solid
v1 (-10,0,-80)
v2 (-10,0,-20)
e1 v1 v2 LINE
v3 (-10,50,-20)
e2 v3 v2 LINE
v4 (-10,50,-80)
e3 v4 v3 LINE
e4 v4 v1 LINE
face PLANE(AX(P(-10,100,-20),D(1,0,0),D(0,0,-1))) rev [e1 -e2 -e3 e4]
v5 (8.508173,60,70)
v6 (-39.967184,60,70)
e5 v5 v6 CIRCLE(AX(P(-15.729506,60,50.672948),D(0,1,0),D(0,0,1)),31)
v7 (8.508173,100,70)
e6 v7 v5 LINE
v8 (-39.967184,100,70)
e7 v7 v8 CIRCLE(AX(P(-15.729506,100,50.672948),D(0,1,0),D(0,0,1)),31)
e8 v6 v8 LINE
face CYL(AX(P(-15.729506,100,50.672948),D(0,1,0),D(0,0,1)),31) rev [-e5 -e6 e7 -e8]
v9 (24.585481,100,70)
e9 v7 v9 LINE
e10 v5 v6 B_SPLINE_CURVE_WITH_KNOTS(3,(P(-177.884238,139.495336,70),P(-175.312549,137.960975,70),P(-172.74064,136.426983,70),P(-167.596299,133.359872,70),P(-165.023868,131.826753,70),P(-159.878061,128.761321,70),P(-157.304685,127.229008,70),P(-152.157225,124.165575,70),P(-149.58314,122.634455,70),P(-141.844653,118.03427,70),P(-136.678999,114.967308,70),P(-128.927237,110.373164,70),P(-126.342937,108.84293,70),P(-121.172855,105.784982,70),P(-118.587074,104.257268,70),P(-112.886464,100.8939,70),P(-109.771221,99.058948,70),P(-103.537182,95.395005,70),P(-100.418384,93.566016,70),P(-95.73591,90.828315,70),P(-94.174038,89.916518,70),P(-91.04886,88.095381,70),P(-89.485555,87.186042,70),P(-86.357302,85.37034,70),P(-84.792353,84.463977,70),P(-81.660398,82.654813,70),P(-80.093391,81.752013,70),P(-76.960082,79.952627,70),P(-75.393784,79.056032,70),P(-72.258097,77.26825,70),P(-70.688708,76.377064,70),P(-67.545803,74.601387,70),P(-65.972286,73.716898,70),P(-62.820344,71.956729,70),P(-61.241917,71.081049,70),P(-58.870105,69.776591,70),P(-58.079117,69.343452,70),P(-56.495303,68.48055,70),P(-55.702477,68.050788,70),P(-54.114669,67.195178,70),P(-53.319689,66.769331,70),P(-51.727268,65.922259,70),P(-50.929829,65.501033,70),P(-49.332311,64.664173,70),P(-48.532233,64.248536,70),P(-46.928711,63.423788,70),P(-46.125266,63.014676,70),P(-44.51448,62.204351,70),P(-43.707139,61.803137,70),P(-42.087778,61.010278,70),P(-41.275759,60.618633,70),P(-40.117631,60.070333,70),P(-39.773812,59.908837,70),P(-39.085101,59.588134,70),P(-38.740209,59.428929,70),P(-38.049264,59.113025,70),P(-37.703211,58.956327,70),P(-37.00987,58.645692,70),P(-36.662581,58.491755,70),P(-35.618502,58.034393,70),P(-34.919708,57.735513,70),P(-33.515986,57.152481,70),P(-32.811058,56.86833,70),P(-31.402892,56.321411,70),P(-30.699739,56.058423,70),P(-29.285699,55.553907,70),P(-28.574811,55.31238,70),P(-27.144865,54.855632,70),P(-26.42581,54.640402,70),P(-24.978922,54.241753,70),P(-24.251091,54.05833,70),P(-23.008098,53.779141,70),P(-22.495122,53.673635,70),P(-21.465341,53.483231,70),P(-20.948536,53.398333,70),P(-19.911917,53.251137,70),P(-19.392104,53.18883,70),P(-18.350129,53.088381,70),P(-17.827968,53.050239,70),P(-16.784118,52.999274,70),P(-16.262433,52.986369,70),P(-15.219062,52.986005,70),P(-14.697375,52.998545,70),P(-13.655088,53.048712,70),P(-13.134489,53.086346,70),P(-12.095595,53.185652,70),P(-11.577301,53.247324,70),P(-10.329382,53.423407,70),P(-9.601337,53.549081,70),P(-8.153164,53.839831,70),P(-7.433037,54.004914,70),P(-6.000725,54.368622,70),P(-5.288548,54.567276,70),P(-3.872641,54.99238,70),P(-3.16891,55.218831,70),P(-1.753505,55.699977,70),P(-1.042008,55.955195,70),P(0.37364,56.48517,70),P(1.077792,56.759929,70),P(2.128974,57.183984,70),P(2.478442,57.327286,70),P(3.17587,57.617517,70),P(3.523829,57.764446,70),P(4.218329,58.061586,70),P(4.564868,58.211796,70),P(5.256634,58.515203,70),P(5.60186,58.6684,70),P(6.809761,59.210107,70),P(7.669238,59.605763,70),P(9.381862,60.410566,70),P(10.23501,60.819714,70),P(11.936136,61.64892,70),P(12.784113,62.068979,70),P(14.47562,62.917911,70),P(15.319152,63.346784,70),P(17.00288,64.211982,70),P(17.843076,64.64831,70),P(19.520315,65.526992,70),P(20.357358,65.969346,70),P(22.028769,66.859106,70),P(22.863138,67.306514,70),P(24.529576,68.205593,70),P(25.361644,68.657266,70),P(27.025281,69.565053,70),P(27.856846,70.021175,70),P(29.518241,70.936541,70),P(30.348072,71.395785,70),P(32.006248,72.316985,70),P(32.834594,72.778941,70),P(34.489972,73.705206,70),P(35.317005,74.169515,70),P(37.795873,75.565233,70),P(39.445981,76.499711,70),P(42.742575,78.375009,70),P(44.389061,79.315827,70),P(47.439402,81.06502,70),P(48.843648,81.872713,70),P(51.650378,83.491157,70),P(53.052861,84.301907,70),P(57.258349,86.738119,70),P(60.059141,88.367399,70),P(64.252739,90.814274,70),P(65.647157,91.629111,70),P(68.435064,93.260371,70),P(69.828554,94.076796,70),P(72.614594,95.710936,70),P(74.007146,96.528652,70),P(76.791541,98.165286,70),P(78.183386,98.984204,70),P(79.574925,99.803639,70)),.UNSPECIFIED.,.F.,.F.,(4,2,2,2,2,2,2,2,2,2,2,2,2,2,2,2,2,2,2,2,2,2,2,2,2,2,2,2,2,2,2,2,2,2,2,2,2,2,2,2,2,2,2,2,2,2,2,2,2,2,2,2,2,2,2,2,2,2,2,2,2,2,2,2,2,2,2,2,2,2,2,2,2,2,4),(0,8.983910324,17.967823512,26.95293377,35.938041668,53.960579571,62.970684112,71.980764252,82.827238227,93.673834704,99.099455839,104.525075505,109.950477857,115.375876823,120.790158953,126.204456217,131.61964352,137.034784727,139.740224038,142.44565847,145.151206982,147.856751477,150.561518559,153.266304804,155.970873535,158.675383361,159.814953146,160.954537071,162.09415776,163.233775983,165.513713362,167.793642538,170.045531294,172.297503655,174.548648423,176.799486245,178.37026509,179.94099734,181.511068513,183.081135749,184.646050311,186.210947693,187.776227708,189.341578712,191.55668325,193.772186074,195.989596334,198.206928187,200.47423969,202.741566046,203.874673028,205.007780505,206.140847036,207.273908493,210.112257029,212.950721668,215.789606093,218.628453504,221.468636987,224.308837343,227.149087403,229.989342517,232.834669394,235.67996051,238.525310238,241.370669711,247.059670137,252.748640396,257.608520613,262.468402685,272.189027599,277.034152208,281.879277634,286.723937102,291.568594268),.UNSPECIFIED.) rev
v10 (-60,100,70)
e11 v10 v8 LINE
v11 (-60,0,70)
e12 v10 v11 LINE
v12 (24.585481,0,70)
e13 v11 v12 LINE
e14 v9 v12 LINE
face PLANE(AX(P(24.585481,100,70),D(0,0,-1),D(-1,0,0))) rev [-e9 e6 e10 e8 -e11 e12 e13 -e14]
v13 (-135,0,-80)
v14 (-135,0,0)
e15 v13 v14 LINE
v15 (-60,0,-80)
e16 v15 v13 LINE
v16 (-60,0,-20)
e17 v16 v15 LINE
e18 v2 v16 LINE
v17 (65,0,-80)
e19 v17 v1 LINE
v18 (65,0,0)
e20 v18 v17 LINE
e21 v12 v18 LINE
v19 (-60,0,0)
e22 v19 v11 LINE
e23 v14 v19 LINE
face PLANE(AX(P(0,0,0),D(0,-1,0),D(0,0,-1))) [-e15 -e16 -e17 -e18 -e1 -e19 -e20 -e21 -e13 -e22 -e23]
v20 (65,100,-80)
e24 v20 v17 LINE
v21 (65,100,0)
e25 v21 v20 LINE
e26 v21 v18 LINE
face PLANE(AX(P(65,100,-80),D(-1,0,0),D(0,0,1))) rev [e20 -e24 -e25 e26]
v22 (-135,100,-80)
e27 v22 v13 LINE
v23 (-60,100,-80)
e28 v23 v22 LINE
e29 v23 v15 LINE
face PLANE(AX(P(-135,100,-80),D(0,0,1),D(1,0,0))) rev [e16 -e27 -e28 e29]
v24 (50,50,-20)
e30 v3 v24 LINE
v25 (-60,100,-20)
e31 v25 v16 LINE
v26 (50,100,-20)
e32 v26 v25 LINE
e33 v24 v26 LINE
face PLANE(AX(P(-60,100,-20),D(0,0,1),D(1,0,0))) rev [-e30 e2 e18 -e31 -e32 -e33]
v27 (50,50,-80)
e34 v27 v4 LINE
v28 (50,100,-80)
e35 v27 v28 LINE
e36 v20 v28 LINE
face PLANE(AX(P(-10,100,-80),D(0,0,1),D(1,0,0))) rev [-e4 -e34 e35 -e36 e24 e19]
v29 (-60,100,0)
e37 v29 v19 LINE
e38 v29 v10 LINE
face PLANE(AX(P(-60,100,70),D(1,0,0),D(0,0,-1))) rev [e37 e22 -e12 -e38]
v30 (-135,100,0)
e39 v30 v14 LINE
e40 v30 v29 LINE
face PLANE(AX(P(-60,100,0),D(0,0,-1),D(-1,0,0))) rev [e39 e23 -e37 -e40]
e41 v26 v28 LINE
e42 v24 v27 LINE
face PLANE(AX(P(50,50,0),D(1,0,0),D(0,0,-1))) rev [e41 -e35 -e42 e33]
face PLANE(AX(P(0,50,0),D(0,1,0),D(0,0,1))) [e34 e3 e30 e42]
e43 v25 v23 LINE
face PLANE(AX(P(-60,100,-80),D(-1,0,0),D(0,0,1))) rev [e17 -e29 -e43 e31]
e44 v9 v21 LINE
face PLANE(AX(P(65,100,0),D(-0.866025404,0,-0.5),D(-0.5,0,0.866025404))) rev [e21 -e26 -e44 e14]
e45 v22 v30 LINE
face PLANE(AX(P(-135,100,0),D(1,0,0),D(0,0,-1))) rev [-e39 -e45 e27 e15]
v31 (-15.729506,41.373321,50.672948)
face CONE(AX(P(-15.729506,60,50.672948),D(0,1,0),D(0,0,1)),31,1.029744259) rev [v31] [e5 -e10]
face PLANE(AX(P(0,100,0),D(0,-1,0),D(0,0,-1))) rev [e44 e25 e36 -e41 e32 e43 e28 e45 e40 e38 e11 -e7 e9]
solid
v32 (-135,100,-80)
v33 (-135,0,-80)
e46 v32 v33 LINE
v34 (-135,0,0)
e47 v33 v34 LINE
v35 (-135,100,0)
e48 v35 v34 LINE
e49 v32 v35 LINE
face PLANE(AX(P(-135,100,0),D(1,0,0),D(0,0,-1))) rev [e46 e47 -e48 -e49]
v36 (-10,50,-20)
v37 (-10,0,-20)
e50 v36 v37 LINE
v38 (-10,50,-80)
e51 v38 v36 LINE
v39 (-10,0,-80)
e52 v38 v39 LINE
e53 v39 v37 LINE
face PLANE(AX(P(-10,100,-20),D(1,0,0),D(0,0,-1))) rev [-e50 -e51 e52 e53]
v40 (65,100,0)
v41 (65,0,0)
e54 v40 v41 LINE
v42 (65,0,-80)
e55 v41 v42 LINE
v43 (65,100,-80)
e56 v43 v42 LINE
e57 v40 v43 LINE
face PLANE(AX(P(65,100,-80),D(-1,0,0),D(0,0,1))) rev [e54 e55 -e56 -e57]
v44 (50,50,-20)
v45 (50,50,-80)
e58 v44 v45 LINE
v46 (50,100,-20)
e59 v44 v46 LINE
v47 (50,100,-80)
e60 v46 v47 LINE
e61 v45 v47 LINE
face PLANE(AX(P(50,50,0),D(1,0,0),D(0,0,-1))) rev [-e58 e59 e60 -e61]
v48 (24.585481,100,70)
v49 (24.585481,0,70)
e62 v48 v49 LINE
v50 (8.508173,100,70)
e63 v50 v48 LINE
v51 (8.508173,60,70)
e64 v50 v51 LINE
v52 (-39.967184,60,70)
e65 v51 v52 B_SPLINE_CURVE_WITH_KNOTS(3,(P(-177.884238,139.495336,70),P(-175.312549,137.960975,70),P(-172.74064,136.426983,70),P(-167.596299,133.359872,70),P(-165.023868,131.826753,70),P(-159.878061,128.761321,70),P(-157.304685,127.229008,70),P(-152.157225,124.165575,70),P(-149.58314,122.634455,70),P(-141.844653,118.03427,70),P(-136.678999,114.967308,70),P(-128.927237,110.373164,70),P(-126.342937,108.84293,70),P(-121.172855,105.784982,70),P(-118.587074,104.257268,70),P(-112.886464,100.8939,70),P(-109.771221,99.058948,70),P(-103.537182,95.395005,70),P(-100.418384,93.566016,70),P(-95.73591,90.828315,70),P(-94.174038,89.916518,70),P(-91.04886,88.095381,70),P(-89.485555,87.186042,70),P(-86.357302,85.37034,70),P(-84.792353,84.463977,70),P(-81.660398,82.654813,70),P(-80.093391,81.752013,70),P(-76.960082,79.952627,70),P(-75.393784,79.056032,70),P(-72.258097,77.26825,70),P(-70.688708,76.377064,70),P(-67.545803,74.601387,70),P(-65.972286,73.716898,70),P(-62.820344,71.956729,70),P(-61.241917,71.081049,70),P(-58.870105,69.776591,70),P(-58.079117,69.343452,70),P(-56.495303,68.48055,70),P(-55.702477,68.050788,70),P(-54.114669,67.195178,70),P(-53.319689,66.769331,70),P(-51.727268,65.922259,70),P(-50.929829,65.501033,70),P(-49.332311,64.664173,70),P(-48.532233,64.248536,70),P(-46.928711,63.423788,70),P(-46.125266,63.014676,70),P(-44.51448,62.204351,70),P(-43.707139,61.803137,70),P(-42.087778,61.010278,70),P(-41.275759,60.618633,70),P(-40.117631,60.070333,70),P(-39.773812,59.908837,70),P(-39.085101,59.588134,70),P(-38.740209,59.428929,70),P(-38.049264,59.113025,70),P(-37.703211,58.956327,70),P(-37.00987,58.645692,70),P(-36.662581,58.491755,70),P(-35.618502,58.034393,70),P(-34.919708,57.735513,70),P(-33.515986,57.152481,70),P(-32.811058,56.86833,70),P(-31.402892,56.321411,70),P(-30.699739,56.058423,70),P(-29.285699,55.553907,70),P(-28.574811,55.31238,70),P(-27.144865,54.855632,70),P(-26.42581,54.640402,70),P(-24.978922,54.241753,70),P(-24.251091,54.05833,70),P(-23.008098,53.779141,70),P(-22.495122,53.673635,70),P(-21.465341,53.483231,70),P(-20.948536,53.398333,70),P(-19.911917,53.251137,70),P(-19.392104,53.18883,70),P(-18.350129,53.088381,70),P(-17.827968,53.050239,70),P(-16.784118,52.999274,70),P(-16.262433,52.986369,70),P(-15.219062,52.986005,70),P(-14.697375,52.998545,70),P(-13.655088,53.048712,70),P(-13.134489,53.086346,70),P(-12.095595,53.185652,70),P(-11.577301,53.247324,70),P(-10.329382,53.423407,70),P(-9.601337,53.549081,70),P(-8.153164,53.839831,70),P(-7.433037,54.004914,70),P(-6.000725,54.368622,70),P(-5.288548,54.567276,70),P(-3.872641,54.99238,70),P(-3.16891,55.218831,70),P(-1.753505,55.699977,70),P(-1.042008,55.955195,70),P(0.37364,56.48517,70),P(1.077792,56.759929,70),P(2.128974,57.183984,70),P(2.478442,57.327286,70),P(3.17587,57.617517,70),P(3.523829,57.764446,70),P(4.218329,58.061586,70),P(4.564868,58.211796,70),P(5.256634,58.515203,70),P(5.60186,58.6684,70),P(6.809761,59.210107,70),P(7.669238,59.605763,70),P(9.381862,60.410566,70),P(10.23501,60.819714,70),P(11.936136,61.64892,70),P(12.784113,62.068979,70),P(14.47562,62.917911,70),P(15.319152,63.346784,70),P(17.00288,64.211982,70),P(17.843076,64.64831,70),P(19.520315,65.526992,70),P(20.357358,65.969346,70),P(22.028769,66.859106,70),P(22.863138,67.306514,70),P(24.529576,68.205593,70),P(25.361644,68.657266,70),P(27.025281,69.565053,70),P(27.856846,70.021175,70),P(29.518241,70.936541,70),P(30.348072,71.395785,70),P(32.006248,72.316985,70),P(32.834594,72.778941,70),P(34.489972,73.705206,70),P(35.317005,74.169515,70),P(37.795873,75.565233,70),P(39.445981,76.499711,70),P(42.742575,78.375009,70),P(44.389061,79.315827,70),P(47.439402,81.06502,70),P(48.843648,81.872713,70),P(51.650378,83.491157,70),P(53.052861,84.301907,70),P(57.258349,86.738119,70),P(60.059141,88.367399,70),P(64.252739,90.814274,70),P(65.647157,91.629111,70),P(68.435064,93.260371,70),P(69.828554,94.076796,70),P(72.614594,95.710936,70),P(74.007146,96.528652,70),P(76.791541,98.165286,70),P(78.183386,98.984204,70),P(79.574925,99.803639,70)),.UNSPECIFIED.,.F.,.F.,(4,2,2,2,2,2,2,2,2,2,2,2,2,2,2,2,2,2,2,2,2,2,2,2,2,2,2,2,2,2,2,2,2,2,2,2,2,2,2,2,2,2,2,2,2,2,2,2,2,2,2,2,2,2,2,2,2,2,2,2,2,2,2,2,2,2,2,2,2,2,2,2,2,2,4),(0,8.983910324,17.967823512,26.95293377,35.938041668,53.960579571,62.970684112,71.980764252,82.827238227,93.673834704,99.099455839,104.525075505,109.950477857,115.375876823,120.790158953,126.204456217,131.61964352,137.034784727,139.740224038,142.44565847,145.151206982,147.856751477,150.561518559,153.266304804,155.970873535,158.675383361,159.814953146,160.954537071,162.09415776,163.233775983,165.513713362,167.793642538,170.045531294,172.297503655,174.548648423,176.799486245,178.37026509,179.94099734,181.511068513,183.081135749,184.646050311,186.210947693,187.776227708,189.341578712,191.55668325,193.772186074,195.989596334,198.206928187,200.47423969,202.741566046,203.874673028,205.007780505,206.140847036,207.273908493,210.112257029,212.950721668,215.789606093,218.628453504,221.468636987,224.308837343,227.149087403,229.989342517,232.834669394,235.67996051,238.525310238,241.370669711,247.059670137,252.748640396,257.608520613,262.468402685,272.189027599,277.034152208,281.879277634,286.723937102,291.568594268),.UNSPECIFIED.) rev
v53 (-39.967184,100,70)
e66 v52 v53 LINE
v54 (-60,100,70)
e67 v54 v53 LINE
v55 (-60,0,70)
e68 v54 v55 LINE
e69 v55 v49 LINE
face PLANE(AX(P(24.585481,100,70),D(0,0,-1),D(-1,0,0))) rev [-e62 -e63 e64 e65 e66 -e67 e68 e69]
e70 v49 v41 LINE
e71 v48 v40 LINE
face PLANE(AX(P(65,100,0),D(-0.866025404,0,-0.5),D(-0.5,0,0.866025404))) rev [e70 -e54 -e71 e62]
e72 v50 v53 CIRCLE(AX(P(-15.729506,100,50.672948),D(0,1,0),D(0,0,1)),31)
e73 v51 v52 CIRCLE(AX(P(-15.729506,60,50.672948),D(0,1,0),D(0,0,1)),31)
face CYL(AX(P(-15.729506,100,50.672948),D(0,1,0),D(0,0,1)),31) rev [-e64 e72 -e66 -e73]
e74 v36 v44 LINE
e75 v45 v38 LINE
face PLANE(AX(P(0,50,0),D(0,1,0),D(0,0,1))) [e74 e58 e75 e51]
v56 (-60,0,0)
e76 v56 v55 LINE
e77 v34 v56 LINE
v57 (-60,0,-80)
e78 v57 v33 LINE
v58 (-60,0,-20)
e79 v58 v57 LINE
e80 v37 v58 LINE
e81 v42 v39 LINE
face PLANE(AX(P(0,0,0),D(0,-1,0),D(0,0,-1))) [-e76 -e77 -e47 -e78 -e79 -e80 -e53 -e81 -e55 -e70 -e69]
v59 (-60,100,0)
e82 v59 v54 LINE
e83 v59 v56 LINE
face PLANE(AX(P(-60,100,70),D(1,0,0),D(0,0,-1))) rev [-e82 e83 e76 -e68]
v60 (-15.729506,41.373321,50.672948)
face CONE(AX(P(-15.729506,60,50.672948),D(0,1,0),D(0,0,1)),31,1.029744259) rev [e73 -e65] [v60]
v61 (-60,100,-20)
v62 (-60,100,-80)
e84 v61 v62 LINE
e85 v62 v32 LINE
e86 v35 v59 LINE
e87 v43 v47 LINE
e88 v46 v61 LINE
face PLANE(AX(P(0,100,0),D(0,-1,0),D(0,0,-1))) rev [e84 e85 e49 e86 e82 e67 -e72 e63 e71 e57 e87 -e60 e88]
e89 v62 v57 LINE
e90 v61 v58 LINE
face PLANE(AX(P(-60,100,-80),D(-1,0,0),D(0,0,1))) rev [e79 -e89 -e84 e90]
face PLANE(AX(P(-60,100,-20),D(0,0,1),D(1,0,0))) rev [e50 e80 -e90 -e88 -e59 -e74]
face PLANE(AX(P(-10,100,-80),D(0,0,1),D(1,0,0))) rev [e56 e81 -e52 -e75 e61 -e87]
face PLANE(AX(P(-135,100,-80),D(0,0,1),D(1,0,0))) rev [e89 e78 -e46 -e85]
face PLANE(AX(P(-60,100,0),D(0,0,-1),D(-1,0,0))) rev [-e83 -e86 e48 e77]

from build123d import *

# Parameters (mm, degrees)
BOSS_EXTRUDE1_DEPTH              = 100
TAP_DRILL_FOR_M68X6_0_TAP1_D     = 62
TAP_DRILL_FOR_M68X6_0_TAP1_DEPTH = 40
TAP_DRILL_FOR_M68X6_0_TAP1_TIP   = 18.62667919
SKETCH4_W                        = 60
SKETCH4_H                        = 60
CUT_EXTRUDE1_DEPTH               = 50
BODY_MOVE_COPY1_DEPTH            = 100
BODY_MOVE_COPY1_2_OUTLINE_W      = 60
BODY_MOVE_COPY1_2_OUTLINE_H      = 60
BODY_MOVE_COPY1_2_DEPTH          = 50
BODY_MOVE_COPY1_START            = 50
BODY_MOVE_COPY1_3_DEPTH          = 10


with BuildPart() as part:
    # Sketch1 → Boss-Extrude1 (new body)
    with BuildSketch(Plane(origin=(0, 0, 0), x_dir=(1, 0, 0), z_dir=(0, 1, 0))):
        Polygon((-135, 0), (-135, 80), (-60, 80), (-60, 20), (-10, 20), (-10, 80), (65, 80), (65, 0), (24.585481157, -70), (-60, -70), (-60, 0), align=None)
    extrude(amount=BOSS_EXTRUDE1_DEPTH)

    # Tap Drill for M68x6.0 Tap1
    with Locations(Plane(origin=(-15.729505574, 100, 50.672948166), x_dir=(0, 0, 1), z_dir=(0, 1, 0))):
        with Locations((0, 0)):
            Hole(TAP_DRILL_FOR_M68X6_0_TAP1_D / 2, depth=TAP_DRILL_FOR_M68X6_0_TAP1_DEPTH)
            with Locations((0, 0, -(TAP_DRILL_FOR_M68X6_0_TAP1_DEPTH + TAP_DRILL_FOR_M68X6_0_TAP1_TIP / 2))):  # 118° drill point
                Cone(0, TAP_DRILL_FOR_M68X6_0_TAP1_D / 2, TAP_DRILL_FOR_M68X6_0_TAP1_TIP, mode=Mode.SUBTRACT)

    # Sketch4 → Cut-Extrude1 (cut)
    with BuildSketch(Plane(origin=(0, 100, 0), x_dir=(1, 0, 0), z_dir=(0, 1, 0))):
        with Locations((20, 50)):
            Rectangle(SKETCH4_W, SKETCH4_H)
    extrude(amount=-CUT_EXTRUDE1_DEPTH, mode=Mode.SUBTRACT)


with BuildPart() as body_2:
    # Body-Move/Copy1: read off the stored shape, not the designer's step
    # Body-Move/Copy1 outline → Body-Move/Copy1 (new body)
    with BuildSketch(Plane(origin=(0, 0, 0), x_dir=(1, 0, 0), z_dir=(0, 1, 0))):
        with BuildLine():
            Line((50, 20), (-60, 20))
            Line((-60, 20), (-60, 80))
            Line((-60, 80), (-135, 80))
            Line((-135, 80), (-135, 0))
            Line((-135, 0), (-60, 0))
            Line((-60, 0), (-60, -70))
            Line((-60, -70), (-39.967184246, -70))
            ThreePointArc((-39.967184246, -70), (-15.729505575, -19.672948166), (8.508173097, -70))
            Line((8.508173097, -70), (24.585481157, -70))
            Line((24.585481157, -70), (65, 0))
            Line((65, 0), (65, 80))
            Line((65, 80), (50, 80))
            Line((50, 80), (50, 20))
        make_face()
    extrude(amount=BODY_MOVE_COPY1_DEPTH)

    # Body-Move_Copy1 2 outline → Body-Move_Copy1 2 (add)
    with BuildSketch(Plane(origin=(0, 0, 0), x_dir=(1, 0, 0), z_dir=(0, 1, 0))):
        with Locations((20, 50)):
            Rectangle(BODY_MOVE_COPY1_2_OUTLINE_W, BODY_MOVE_COPY1_2_OUTLINE_H)
        with BuildLine():
            Line((-39.967184246, -70), (8.508173097, -70))
            ThreePointArc((8.508173097, -70), (-15.729505575, -19.672948166), (-39.967184246, -70))
        make_face()
    extrude(amount=BODY_MOVE_COPY1_2_DEPTH)

    # Body-Move_Copy1 3 outline → Body-Move_Copy1 3 (add)
    with BuildSketch(Plane(origin=(0, 0, 0), x_dir=(1, 0, 0), z_dir=(0, 1, 0)).offset(BODY_MOVE_COPY1_START)):
        with BuildLine():
            Line((-39.967184246, -70), (8.508173097, -70))
            ThreePointArc((8.508173097, -70), (-15.729505575, -19.672948166), (-39.967184246, -70))
        make_face()
    extrude(amount=BODY_MOVE_COPY1_3_DEPTH)

    # Body-Move_Copy1 4 outline → Body-Move_Copy1 4 (revolve, cut)
    with BuildSketch(Plane(origin=(-15.729505574, 0, 50.672948166), x_dir=(1, 0, 0), z_dir=(0, 0, 1))):
        Polygon((0, 60.000000051), (0, 41.37332081), (31.000000085, 60.000000051), align=None)
    revolve(axis=Axis((-15.729505574, 0, 50.672948166), (0, 1, 0)), mode=Mode.SUBTRACT)


solid = Compound([part.part, body_2.part])
